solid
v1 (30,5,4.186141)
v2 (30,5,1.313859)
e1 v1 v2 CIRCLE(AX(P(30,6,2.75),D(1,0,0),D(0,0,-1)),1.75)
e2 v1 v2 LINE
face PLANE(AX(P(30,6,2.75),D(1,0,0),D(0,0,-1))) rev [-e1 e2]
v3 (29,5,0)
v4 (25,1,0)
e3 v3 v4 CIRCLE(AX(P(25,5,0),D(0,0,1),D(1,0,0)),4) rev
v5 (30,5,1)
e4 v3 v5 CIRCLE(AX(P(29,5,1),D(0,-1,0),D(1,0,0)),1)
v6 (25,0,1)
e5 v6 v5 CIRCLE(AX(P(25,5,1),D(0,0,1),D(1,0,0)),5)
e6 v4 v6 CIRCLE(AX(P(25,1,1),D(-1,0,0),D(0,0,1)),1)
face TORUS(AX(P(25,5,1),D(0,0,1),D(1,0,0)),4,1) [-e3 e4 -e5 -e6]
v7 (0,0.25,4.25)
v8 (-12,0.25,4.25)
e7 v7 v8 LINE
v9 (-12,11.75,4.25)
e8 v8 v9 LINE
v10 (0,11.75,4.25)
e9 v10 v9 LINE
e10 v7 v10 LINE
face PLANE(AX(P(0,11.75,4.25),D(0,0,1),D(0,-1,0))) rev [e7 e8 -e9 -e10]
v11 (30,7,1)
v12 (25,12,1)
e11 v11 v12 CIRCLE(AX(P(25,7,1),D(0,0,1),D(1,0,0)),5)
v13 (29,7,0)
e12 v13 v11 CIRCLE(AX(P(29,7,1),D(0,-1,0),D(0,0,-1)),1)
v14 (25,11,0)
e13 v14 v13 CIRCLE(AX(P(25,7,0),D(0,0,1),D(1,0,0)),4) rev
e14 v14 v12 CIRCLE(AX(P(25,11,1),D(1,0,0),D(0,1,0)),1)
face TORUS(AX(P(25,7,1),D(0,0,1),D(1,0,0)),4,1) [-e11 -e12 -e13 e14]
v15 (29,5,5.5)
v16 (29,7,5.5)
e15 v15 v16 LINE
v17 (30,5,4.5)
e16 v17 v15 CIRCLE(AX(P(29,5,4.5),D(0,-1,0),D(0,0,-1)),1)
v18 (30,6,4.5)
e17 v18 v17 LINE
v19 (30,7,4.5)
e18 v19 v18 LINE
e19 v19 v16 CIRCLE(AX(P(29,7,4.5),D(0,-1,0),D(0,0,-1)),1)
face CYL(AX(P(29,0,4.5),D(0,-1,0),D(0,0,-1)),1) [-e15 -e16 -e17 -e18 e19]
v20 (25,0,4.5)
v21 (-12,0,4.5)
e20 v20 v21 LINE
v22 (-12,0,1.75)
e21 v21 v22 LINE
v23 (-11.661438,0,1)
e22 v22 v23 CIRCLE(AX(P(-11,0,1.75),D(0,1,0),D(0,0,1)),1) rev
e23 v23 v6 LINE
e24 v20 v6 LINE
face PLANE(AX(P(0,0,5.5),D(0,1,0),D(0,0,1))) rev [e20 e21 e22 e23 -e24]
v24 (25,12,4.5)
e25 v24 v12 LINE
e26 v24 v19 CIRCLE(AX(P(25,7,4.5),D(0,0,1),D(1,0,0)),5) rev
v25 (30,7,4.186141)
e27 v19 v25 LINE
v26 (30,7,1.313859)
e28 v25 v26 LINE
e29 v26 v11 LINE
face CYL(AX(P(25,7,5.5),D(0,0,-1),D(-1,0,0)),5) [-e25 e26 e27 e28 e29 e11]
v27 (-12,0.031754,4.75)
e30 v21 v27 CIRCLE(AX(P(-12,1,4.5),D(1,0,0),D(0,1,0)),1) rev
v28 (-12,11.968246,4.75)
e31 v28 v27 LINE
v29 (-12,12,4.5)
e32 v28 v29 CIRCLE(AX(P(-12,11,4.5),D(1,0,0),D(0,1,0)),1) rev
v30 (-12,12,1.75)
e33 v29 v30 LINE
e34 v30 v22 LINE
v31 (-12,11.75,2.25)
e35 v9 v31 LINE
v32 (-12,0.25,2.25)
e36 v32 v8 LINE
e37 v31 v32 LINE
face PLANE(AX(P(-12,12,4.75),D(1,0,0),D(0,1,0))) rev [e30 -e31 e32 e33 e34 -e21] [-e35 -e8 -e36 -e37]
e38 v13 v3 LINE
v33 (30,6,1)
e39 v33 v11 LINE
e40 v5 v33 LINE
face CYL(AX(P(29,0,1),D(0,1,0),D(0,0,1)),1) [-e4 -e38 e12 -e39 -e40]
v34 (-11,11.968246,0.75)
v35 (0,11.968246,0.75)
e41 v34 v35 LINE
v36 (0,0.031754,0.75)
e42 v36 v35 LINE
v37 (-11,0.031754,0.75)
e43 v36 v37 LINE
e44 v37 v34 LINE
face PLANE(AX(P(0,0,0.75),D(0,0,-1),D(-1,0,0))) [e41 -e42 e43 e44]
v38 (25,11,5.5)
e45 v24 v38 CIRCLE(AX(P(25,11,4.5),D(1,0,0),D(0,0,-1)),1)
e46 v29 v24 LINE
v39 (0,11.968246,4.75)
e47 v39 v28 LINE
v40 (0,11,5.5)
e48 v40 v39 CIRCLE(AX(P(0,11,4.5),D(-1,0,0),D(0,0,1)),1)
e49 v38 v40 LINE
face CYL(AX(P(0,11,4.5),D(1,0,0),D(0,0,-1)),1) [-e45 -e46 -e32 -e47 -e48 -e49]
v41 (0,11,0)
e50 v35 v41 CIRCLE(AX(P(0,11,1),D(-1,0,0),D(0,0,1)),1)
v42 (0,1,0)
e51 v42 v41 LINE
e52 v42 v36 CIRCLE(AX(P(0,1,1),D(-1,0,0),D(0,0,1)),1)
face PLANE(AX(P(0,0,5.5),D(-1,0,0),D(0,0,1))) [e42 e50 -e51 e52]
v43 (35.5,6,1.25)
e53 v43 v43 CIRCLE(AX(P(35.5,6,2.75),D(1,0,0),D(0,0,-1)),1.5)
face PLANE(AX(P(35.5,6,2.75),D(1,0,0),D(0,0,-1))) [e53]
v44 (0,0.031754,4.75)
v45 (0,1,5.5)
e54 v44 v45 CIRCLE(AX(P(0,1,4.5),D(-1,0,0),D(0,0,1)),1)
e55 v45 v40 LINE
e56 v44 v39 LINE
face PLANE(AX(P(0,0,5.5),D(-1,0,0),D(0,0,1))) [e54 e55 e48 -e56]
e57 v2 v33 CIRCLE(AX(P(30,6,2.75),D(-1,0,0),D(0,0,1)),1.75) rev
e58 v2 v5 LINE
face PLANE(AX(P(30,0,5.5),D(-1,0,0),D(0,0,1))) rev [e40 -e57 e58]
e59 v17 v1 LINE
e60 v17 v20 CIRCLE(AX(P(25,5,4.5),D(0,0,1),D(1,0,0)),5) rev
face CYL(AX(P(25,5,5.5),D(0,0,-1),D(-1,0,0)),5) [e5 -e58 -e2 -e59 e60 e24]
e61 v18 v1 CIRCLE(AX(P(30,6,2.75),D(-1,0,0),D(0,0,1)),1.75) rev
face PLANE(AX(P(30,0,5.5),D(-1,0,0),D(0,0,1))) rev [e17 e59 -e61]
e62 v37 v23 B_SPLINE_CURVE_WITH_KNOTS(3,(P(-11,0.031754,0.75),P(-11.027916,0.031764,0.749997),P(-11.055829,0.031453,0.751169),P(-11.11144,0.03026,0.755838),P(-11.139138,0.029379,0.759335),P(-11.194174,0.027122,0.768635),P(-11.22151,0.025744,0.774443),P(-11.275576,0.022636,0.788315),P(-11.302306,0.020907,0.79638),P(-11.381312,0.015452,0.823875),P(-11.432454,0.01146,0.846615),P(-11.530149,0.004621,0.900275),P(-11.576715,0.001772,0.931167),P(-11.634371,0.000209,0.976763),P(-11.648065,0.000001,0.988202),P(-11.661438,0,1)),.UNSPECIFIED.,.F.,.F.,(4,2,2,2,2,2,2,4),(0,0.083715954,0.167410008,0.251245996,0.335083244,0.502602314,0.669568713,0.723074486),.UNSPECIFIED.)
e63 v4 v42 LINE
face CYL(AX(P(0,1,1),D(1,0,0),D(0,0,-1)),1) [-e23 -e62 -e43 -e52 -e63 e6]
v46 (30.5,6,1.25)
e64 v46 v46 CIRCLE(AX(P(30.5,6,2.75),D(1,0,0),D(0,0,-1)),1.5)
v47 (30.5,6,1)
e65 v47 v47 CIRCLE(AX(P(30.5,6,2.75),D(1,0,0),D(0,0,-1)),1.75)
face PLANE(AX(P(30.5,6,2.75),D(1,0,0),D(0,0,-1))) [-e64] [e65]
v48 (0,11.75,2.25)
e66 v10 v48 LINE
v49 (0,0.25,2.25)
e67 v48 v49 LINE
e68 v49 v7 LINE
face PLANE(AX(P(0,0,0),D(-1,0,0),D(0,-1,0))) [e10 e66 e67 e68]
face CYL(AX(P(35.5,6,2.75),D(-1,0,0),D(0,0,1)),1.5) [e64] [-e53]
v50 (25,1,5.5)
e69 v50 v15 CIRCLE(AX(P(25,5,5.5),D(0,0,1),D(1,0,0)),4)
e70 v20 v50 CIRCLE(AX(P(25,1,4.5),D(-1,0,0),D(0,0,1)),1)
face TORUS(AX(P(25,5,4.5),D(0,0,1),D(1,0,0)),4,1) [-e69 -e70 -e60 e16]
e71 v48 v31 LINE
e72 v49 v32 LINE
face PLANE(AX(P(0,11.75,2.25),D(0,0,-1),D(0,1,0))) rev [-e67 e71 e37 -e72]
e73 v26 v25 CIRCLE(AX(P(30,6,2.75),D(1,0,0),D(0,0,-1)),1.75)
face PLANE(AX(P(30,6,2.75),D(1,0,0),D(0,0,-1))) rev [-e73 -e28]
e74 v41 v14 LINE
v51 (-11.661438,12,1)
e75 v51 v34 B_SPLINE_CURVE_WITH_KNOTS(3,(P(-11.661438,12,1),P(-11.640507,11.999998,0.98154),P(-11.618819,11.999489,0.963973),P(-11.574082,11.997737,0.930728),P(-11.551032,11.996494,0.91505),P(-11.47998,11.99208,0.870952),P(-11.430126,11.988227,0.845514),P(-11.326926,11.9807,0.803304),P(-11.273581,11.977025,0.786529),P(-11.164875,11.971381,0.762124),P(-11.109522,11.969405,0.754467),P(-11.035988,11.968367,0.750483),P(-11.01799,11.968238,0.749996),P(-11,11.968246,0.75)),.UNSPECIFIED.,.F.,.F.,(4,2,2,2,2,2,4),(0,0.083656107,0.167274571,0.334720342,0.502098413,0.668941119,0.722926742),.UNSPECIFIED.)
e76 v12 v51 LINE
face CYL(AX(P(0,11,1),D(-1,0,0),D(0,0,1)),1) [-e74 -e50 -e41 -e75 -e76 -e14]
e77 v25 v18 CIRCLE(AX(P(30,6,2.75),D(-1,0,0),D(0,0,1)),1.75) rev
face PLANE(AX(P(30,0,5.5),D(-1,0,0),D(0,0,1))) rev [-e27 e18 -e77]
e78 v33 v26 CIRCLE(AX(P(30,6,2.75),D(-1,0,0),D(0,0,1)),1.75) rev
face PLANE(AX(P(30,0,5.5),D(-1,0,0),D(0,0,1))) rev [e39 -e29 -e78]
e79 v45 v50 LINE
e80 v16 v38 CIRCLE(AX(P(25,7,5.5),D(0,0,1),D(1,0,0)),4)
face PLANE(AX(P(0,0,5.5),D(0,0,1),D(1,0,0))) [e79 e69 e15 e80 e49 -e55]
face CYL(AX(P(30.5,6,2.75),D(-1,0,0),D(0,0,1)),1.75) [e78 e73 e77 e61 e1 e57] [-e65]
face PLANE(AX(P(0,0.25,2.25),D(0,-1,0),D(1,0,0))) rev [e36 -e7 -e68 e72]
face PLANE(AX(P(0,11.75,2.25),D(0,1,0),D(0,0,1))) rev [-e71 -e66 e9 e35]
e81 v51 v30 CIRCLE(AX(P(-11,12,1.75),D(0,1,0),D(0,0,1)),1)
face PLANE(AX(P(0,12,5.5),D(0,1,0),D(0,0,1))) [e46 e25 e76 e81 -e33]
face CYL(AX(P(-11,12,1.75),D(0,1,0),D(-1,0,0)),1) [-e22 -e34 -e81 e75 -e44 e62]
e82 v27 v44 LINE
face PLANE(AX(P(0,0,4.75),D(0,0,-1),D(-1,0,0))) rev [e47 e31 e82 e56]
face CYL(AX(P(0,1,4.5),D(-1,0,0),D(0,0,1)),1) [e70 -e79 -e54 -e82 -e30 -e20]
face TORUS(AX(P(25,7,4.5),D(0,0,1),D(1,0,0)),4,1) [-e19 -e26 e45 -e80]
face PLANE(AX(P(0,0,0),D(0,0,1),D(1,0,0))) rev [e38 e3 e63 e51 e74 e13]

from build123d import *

# Parameters (mm, degrees)
BOSS_EXTRU_1_DEPTH      = 5.5
ESQUISSE6_W             = 12
ESQUISSE6_H             = 12
BOSS_EXTRU_4_DEPTH      = 4
ESQUISSE7_R             = 1.75
BOSS_EXTRU_7_DEPTH      = 0.5
ESQUISSE8_R             = 1.5
BOSS_EXTRU_9_DEPTH      = 5
CONG_1_R                = 1
CONG_2_R                = 1
CONG_3_R                = 1
ESQUISSE9_W             = 2
ESQUISSE9_H             = 11.5
ENL_V_MAT_EXTRU_1_DEPTH = 12


with BuildPart() as part:
    # Esquisse1 → Boss.-Extru.1 (new body)
    with BuildSketch(Plane.XY):
        with BuildLine():
            ThreePointArc((25, 12), (28.535533906, 10.535533906), (30, 7))
            Line((30, 7), (30, 5))
            ThreePointArc((30, 5), (28.535533906, 1.464466094), (25, 0))
            Line((25, 0), (0, 0))
            Line((0, 0), (0, 12))
            Line((0, 12), (25, 12))
        make_face()
    extrude(amount=BOSS_EXTRU_1_DEPTH)

    # Esquisse6 → Boss.-Extru.4 (add)
    with BuildSketch(Plane.XY.offset(0.75)):
        with Locations((-6, 6)):
            Rectangle(ESQUISSE6_W, ESQUISSE6_H)
    extrude(amount=BOSS_EXTRU_4_DEPTH)

    # Esquisse7 → Boss.-Extru.7 (add)
    with BuildSketch(Plane(origin=(30, 0, 0), x_dir=(0, 0, -1), z_dir=(1, 0, 0))):
        with Locations(Location((-2.75, 6, 0), (0, 0, 214.849904579))):
            Circle(ESQUISSE7_R)
    extrude(amount=BOSS_EXTRU_7_DEPTH)

    # Esquisse8 → Boss.-Extru.9 (add)
    with BuildSketch(Plane(origin=(30.5, 0, 0), x_dir=(0, 0, -1), z_dir=(1, 0, 0))):
        with Locations((-2.75, 6)):
            Circle(ESQUISSE8_R)
    extrude(amount=BOSS_EXTRU_9_DEPTH)

    # Congé1
    cong_1_edges = [part.edges().sort_by_distance(p)[0] for p in [
        (12.5, 0, 5.5),
        (28.535533906, 1.464466094, 5.5),
        (30, 6, 5.5),
        (28.535533906, 10.535533906, 5.5),
        (12.5, 12, 5.5),
    ]]
    fillet(cong_1_edges, radius=CONG_1_R - 0.0001)  # a hair under: the kernel refuses the full size

    # Congé2
    cong_2_edges = [part.edges().sort_by_distance(p)[0] for p in [
        (-12, 6, 0.75),
    ]]
    fillet(cong_2_edges, radius=CONG_2_R)

    # Congé3
    cong_3_edges = [part.edges().sort_by_distance(p)[0] for p in [
        (12.5, 0, 0),
        (28.535533906, 1.464466094, 0),
        (30, 6, 0),
        (28.535533906, 10.535533906, 0),
        (12.5, 12, 0),
    ]]
    fillet(cong_3_edges, radius=CONG_3_R - 0.0001)  # a hair under: the kernel refuses the full size

    # Esquisse9 → Enlèv. mat.-Extru.1 (cut)
    with BuildSketch(Plane.ZY.offset(12)):
        with Locations((3.25, 6)):
            Rectangle(ESQUISSE9_W, ESQUISSE9_H)
    extrude(amount=-ENL_V_MAT_EXTRU_1_DEPTH, mode=Mode.SUBTRACT)


solid = part.part
